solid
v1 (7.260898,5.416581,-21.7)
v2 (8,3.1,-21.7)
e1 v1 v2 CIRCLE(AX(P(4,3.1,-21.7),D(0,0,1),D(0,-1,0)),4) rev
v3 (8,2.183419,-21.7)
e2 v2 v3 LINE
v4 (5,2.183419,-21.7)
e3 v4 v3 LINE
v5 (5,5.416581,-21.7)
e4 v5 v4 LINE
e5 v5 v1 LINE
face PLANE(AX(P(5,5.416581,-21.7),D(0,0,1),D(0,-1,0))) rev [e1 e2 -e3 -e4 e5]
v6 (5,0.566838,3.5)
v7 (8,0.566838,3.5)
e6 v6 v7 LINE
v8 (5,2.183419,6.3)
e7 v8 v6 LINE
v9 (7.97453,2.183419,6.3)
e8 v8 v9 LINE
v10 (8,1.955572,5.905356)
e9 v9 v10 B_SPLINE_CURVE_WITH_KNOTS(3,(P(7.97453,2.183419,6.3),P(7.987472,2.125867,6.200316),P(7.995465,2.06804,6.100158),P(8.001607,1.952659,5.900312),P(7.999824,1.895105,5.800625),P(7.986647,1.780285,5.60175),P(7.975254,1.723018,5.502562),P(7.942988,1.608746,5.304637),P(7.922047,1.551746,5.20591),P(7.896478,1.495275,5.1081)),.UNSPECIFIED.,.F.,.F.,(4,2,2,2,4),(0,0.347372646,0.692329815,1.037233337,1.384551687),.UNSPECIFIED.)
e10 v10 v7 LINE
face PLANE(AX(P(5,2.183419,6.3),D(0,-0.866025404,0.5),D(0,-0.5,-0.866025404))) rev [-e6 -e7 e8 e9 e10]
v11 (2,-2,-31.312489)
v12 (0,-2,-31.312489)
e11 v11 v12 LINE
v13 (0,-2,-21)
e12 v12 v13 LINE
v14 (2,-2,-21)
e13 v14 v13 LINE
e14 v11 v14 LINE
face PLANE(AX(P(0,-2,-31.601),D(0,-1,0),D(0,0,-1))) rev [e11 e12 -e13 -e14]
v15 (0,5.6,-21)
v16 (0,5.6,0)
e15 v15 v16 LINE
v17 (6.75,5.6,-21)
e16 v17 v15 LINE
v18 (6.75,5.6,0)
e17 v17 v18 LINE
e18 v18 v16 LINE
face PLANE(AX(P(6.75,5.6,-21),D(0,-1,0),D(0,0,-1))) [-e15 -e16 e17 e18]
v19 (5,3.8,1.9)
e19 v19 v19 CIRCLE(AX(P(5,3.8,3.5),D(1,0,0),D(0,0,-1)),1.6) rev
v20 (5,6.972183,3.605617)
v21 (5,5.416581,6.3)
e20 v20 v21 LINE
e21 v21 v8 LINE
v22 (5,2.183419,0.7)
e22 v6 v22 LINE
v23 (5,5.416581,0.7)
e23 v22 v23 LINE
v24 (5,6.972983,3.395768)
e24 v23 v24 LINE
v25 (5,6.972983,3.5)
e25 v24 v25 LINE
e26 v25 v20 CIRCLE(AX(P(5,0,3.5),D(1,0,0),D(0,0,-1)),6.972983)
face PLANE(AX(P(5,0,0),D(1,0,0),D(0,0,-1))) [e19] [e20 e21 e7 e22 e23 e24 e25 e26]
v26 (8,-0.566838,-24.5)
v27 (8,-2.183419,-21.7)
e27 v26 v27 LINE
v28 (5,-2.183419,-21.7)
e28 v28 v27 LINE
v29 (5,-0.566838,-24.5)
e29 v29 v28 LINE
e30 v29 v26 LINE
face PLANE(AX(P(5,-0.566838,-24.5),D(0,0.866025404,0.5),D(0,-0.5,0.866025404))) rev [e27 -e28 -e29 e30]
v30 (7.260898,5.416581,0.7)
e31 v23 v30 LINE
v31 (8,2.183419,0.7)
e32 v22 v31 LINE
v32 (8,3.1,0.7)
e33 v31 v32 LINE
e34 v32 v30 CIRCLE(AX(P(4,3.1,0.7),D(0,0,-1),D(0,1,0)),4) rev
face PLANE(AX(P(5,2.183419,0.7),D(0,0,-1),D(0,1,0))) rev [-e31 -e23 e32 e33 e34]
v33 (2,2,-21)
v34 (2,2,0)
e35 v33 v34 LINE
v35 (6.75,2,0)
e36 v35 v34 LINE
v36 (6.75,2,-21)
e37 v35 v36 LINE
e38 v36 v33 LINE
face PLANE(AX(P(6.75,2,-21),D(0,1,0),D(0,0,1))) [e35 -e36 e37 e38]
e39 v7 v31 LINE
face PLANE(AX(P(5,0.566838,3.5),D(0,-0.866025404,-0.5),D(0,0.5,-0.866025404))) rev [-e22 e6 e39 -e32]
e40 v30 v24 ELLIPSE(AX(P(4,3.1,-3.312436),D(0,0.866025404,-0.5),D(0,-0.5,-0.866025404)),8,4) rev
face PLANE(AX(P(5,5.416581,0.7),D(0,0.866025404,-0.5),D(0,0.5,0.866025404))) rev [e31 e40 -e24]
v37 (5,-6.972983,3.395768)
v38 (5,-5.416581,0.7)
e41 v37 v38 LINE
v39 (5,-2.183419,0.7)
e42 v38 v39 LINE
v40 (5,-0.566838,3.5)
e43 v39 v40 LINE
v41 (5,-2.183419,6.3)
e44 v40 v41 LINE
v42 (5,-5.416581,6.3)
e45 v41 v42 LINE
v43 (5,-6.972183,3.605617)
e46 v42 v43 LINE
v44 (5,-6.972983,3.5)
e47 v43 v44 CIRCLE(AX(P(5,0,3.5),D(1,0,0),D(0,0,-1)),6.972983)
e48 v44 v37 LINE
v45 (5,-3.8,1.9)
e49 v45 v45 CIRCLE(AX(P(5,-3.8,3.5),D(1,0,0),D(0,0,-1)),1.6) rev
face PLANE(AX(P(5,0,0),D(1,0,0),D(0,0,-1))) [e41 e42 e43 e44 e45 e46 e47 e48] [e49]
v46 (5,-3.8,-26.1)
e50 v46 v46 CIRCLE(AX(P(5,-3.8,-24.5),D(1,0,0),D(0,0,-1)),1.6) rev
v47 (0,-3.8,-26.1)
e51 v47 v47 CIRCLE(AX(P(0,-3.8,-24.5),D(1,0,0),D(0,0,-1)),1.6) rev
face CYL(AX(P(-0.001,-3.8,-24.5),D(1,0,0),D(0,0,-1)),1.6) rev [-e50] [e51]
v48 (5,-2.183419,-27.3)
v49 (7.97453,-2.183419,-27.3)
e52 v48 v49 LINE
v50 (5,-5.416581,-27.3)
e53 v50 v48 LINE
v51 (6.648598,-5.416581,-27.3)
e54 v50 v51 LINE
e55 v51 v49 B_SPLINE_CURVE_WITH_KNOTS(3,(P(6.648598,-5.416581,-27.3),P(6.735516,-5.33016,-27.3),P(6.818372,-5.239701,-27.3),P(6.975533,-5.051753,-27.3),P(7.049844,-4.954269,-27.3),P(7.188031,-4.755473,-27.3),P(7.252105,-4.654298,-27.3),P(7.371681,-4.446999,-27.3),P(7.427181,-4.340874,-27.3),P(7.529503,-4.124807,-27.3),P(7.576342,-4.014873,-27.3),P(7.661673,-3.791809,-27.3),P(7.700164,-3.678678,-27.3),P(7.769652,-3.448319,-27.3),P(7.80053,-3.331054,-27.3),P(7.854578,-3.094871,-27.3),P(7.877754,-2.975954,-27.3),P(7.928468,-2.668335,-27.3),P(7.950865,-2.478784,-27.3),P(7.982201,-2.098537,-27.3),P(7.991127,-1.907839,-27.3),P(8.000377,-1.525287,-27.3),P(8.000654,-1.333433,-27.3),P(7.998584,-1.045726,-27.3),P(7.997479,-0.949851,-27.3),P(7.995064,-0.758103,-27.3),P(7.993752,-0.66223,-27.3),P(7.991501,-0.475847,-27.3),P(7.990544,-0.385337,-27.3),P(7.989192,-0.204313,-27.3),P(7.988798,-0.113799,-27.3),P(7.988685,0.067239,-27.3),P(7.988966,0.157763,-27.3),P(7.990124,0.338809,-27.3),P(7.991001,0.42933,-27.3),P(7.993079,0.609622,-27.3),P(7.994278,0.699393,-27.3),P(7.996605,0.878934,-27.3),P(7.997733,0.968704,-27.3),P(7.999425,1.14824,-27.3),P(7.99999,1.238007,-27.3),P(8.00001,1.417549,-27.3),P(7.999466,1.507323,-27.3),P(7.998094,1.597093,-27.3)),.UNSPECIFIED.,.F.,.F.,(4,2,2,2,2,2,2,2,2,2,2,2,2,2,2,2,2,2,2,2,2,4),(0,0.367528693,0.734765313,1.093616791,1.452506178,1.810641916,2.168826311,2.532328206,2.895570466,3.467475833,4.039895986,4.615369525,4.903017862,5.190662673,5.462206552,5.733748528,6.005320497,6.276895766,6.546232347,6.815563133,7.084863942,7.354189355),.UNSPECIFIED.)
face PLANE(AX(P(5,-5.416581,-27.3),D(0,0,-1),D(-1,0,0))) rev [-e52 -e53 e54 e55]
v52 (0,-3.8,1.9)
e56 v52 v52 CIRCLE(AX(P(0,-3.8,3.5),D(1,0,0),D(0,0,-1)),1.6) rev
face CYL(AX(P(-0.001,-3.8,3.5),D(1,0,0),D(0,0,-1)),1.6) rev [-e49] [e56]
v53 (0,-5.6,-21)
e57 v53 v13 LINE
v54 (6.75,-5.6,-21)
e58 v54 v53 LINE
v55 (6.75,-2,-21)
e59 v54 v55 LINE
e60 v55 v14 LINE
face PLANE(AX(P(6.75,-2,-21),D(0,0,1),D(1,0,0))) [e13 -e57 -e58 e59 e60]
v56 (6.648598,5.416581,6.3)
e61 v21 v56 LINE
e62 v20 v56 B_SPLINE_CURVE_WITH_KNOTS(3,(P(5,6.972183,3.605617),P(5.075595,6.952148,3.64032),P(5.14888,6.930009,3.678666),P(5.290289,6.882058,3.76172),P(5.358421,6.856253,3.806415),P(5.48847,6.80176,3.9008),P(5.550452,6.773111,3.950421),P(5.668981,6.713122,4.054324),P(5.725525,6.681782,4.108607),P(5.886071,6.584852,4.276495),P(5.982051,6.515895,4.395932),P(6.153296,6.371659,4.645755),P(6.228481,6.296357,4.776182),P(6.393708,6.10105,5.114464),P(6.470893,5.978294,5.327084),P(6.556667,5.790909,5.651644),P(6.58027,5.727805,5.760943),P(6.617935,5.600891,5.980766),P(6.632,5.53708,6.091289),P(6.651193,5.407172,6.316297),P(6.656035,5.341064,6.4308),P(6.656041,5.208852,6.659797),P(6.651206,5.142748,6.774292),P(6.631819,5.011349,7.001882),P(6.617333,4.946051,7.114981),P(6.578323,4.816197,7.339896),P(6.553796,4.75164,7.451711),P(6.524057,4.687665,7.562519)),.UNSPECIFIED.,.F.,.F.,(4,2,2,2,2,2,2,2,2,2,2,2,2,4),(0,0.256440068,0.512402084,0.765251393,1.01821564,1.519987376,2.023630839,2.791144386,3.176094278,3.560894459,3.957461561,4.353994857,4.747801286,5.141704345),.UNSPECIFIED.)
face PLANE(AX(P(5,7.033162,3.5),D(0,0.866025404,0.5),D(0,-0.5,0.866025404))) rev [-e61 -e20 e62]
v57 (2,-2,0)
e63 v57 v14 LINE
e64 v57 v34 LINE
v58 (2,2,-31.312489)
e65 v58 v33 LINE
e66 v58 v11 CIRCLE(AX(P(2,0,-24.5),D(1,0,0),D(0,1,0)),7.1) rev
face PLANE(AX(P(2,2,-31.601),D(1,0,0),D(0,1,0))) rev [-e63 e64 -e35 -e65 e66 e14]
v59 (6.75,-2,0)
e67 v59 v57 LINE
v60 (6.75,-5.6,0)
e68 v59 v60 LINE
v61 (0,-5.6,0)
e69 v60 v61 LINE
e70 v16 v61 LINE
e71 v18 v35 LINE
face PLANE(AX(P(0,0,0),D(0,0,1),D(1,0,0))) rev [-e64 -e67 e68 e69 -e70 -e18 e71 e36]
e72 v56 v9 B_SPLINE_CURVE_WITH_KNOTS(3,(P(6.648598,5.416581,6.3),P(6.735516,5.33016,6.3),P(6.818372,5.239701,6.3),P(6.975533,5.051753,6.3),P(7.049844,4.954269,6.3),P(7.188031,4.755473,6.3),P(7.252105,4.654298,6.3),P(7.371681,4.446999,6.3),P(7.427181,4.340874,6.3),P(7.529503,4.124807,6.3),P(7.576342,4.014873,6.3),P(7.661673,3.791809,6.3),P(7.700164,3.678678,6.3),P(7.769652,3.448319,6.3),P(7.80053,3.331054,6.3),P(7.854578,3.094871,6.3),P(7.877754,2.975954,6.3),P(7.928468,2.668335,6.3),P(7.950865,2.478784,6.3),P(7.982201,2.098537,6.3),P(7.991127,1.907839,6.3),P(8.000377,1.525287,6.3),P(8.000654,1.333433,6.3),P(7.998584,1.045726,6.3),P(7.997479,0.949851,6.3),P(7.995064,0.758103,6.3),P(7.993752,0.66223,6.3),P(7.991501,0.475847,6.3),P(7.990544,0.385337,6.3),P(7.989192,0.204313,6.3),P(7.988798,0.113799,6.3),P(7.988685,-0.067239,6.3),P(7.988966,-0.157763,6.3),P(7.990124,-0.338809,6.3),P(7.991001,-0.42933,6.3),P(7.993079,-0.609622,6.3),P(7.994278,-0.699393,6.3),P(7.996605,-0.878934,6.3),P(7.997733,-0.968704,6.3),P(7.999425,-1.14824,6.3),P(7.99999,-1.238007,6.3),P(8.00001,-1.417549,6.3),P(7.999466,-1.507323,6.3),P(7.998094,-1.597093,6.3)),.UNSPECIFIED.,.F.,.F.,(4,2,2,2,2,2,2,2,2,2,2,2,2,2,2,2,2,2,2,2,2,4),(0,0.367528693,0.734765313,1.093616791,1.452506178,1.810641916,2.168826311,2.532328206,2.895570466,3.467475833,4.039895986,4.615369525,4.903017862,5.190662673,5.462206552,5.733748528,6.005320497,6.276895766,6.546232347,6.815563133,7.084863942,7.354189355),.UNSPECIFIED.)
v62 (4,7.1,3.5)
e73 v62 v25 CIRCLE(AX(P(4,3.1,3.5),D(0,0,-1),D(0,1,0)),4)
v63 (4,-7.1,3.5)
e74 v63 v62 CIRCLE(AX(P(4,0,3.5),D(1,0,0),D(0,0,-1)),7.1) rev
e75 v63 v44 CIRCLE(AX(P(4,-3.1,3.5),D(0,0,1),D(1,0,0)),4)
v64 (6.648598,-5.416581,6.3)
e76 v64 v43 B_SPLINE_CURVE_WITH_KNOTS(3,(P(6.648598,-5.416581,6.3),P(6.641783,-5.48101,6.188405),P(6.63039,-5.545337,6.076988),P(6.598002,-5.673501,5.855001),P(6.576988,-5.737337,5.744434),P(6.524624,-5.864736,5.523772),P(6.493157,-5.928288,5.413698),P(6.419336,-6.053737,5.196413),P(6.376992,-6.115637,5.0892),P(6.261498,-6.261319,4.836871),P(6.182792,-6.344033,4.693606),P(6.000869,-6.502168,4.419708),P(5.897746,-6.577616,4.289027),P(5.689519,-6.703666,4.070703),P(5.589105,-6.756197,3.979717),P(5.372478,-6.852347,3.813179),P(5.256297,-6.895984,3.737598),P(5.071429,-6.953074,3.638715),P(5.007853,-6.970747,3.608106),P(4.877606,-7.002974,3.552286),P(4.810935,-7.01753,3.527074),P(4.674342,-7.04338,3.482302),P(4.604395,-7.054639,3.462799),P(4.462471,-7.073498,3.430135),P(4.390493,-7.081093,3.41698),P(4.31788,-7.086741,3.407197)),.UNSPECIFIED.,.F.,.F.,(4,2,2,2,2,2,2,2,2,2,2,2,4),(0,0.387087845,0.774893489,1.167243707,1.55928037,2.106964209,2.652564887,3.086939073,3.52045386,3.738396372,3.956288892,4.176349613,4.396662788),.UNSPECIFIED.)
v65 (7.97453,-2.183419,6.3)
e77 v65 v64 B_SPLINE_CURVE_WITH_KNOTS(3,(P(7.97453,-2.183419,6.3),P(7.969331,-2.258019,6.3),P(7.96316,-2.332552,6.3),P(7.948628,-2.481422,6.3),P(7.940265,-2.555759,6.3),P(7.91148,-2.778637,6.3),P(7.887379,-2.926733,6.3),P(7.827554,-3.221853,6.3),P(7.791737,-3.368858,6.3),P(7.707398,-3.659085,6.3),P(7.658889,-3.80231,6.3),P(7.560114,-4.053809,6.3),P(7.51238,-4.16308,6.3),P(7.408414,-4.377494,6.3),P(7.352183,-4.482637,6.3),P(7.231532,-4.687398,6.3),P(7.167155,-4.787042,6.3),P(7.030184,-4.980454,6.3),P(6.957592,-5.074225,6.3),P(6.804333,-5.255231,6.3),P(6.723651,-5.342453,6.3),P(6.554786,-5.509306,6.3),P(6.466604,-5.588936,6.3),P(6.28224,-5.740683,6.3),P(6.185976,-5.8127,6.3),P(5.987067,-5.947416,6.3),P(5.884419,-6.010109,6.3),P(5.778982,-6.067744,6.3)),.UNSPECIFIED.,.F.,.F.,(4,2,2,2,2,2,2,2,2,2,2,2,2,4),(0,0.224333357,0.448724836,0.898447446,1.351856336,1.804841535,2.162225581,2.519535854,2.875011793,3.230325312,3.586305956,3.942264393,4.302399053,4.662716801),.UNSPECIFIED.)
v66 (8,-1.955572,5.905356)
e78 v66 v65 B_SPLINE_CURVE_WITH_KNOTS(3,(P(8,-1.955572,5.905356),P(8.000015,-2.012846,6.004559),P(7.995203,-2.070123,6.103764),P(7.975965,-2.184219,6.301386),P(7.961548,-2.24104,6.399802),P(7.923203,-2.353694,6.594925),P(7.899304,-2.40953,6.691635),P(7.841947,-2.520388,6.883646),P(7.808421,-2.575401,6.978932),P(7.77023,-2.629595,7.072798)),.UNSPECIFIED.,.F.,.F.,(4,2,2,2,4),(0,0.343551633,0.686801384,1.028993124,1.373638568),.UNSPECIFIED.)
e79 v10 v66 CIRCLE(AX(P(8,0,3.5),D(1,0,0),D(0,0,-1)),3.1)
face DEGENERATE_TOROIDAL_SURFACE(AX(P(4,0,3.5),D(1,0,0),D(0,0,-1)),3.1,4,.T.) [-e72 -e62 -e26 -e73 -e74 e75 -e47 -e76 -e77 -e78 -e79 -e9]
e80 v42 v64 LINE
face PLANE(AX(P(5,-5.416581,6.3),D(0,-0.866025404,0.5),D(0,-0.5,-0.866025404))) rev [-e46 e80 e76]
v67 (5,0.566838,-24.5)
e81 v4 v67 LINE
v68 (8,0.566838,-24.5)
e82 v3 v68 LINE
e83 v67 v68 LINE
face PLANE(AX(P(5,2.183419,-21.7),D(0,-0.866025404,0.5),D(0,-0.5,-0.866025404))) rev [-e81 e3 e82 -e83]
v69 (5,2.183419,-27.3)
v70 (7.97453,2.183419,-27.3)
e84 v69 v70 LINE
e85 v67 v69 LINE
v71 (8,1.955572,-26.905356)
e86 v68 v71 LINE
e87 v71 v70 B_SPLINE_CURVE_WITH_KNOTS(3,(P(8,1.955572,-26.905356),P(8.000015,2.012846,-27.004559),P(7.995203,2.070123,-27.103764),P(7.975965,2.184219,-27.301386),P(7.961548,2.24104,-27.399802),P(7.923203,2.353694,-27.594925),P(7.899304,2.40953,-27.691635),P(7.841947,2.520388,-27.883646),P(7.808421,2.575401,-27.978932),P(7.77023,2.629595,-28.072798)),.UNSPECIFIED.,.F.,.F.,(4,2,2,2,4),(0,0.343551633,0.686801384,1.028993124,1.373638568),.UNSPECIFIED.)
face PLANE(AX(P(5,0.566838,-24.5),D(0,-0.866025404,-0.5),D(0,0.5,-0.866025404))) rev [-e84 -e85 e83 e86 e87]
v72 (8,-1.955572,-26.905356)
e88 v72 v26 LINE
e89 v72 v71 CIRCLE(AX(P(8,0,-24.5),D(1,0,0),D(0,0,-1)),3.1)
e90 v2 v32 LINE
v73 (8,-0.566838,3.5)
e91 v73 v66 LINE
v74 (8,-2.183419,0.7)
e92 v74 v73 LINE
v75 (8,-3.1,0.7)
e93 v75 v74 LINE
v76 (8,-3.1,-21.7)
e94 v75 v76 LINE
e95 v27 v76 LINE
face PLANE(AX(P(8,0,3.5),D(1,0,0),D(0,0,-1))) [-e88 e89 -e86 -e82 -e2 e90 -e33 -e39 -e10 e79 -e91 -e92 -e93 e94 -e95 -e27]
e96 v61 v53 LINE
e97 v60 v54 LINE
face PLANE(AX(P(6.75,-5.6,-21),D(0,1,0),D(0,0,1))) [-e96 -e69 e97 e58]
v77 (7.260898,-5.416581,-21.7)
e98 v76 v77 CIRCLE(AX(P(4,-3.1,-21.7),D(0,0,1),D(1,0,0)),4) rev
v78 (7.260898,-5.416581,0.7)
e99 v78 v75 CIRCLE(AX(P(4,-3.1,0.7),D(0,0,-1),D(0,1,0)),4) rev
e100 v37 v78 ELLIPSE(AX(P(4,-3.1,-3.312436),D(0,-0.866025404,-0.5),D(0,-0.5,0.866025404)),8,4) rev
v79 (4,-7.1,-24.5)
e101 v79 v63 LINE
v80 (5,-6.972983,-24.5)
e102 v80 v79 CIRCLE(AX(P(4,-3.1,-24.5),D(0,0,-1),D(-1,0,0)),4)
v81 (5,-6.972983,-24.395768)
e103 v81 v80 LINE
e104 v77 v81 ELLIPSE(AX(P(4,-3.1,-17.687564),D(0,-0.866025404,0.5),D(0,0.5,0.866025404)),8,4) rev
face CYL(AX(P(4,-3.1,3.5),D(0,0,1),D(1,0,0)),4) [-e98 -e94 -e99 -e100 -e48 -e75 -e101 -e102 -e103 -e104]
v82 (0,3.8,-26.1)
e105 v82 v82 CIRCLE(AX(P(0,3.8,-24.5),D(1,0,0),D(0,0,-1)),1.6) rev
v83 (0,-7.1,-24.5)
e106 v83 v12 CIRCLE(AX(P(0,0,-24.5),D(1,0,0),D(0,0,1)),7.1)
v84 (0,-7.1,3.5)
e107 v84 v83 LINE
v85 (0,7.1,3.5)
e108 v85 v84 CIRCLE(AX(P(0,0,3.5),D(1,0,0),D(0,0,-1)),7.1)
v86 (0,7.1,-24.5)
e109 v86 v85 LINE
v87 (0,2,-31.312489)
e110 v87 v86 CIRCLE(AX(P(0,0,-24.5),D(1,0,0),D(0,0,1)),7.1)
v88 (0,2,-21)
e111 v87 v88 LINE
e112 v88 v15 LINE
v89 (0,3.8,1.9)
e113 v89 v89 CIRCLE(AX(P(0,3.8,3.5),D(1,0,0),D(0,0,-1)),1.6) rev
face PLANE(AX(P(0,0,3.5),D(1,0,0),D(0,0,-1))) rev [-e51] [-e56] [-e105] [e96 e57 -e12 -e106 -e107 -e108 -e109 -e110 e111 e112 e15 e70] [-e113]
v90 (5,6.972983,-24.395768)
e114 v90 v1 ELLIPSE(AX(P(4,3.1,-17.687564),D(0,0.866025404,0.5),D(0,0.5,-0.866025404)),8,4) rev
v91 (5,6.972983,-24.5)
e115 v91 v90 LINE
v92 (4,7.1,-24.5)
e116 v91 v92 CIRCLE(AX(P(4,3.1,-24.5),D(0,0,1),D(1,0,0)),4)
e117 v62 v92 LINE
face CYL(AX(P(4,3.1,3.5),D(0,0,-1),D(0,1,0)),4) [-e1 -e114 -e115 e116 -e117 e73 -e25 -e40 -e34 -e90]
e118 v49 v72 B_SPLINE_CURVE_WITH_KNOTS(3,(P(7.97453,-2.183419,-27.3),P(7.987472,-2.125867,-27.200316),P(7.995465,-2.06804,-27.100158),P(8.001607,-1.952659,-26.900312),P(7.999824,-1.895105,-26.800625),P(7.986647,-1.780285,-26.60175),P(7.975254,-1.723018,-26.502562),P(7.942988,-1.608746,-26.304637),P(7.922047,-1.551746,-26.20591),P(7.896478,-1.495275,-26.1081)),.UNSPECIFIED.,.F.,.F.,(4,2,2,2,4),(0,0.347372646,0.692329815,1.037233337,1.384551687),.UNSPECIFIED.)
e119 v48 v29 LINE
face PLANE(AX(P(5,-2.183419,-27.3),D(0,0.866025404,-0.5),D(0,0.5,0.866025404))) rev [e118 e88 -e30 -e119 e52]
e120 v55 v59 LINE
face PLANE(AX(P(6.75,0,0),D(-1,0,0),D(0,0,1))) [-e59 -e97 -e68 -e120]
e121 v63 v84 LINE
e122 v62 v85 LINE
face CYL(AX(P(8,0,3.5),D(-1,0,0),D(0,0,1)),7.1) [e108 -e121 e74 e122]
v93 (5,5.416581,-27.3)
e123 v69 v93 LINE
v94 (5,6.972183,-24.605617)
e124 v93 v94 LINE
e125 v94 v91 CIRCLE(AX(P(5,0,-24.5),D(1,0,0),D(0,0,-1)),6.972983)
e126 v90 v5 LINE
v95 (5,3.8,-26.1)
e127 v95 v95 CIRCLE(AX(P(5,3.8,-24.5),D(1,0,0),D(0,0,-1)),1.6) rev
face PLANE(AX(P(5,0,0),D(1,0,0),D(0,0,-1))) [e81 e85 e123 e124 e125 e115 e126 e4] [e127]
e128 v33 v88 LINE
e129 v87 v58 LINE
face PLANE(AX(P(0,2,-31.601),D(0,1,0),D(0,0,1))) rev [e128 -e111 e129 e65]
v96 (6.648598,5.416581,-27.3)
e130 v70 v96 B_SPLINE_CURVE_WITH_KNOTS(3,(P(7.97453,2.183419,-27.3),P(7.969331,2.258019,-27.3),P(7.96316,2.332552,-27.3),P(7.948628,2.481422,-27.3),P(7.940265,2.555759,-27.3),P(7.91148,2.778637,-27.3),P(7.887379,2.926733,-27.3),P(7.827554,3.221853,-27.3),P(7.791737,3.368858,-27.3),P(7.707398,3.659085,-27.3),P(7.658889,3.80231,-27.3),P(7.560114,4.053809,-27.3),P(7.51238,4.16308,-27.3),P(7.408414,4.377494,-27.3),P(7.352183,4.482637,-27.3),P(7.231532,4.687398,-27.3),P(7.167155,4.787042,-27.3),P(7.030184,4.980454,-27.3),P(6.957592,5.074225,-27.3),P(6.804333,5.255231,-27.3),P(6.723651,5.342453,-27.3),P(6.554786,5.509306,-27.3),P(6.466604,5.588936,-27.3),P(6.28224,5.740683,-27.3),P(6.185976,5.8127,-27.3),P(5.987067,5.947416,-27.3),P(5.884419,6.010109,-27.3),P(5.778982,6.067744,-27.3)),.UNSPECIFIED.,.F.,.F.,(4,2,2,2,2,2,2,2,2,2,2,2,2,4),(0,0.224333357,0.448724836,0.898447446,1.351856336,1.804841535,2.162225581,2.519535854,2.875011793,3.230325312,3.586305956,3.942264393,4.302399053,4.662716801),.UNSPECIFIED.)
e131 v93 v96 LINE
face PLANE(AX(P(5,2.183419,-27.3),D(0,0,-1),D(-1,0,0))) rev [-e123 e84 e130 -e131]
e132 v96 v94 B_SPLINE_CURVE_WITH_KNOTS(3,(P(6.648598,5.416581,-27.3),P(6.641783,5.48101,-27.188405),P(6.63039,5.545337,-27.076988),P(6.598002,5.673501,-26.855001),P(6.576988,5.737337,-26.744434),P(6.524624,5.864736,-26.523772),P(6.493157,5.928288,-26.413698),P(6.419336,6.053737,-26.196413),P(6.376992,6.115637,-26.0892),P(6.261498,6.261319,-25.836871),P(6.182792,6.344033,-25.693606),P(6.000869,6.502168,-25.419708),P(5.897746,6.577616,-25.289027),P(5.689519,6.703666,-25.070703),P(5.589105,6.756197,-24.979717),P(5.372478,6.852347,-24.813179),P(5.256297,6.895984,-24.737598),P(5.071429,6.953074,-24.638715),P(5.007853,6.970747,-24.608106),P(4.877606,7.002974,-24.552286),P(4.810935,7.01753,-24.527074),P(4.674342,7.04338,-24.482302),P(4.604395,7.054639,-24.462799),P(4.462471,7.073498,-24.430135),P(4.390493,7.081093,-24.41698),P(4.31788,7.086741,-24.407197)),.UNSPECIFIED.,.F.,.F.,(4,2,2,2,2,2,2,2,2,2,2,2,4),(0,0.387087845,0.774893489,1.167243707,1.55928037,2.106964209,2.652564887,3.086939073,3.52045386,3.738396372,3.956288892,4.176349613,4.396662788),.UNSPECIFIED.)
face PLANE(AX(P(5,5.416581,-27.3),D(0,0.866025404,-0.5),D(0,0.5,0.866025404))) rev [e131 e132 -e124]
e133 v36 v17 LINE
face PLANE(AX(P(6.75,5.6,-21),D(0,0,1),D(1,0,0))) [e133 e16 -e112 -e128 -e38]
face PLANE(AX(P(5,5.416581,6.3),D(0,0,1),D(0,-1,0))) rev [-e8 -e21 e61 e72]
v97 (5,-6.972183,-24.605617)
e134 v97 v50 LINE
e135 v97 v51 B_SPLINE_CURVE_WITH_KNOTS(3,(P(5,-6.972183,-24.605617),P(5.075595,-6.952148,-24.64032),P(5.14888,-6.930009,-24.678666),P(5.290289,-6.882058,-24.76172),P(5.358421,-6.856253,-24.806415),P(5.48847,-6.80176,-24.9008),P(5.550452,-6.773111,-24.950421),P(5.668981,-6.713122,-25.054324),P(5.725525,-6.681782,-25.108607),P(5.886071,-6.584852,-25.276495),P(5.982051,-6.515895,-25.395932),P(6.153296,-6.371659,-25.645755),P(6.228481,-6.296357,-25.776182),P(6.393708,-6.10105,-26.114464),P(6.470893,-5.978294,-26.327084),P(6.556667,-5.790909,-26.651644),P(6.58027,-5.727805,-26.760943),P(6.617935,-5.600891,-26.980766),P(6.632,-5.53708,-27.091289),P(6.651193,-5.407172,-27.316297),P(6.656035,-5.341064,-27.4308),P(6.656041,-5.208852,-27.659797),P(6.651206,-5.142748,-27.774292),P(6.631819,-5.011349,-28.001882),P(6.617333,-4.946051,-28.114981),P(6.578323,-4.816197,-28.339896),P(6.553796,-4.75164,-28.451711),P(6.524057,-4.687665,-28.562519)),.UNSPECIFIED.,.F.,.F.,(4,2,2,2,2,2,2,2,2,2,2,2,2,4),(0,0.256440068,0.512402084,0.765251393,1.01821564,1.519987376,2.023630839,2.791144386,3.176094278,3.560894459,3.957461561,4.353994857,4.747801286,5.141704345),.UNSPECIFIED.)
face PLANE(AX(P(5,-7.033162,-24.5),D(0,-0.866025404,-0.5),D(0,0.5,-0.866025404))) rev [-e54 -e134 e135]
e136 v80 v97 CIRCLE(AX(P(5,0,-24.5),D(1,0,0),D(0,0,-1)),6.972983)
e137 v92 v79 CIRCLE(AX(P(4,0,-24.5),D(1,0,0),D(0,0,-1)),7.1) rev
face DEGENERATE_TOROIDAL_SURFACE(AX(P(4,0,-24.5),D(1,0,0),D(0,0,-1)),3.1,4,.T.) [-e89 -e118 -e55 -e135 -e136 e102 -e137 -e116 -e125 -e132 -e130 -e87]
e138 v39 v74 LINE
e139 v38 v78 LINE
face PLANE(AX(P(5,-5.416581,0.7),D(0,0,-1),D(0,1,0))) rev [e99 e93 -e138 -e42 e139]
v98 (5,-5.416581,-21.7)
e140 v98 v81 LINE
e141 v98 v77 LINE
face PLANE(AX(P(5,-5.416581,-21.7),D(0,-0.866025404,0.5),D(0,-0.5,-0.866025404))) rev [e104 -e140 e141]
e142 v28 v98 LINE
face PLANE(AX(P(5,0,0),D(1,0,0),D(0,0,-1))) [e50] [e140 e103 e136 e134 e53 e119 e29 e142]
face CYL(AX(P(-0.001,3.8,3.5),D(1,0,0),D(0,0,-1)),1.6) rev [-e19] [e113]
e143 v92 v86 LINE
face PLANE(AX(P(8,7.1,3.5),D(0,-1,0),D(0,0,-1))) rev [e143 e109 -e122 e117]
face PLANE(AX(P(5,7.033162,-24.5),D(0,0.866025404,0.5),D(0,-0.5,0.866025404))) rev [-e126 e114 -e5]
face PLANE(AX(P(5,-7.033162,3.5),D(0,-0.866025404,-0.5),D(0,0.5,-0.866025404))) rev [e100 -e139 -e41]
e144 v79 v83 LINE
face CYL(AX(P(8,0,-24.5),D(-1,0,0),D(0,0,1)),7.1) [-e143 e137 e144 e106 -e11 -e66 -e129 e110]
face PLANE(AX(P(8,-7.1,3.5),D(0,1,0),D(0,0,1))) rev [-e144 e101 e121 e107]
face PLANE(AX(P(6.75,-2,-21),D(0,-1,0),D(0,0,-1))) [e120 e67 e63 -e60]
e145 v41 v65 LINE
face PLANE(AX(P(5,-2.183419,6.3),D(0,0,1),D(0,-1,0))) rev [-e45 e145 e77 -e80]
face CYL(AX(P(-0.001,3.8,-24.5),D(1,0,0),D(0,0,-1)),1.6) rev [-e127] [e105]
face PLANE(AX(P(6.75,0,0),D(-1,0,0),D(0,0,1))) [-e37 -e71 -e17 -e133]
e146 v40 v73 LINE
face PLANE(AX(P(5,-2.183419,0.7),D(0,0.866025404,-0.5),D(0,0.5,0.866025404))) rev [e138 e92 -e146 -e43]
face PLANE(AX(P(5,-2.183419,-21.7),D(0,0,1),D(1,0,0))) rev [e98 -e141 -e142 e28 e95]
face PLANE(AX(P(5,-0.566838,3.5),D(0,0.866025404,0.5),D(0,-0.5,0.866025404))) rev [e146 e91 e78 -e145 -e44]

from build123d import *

# Parameters (mm, degrees)
BOSS_EXTRUDE1_DEPTH = 8
CUT_EXTRUDE5_REACH  = 35.361
SKETCH4_W           = 2
SKETCH4_H           = 4
SKETCH5_W           = 21
SKETCH5_H           = 3.6
CUT_EXTRUDE2_DEPTH  = 6.75
SKETCH6_R           = 1.6
CUT_EXTRUDE3_DEPTH  = 8
CUT_EXTRUDE4_DEPTH  = 3
FILLET1_R           = 4


with BuildPart() as part:
    # Sketch2 → Boss-Extrude1 (new body)
    with BuildSketch(Plane(origin=(0, 0, 0), x_dir=(0, 0, -1), z_dir=(1, 0, 0))):
        with BuildLine():
            Line((-3.5, 7.1), (24.5, 7.1))
            ThreePointArc((24.5, 7.1), (31.6, 0), (24.5, -7.1))
            Line((24.5, -7.1), (-3.5, -7.1))
            ThreePointArc((-3.5, -7.1), (-10.6, 0), (-3.5, 7.1))
        make_face()
    extrude(amount=BOSS_EXTRUDE1_DEPTH)

    # Sketch4 → Cut-Extrude5 (cut, up to next)
    with BuildSketch(Plane.XY, mode=Mode.PRIVATE) as cut_extrude5_sk1:
        with Locations((1, 0)):
            Rectangle(SKETCH4_W, SKETCH4_H)
    cut_extrude5_tool1 = extrude(cut_extrude5_sk1.sketch, amount=-CUT_EXTRUDE5_REACH, mode=Mode.PRIVATE) & part.part
    add(cut_extrude5_tool1.solids().sort_by_distance((1, 0, 0))[0], mode=Mode.SUBTRACT)

    # Sketch5 → Cut-Extrude2 (cut)
    with BuildSketch(Plane(origin=(0, 0, 0), x_dir=(0, 0, -1), z_dir=(1, 0, 0))):
        with Locations((10.5, 3.8)):
            Rectangle(SKETCH5_W, SKETCH5_H)
        with Locations((10.5, -3.8)):
            Rectangle(SKETCH5_W, SKETCH5_H)
    extrude(amount=CUT_EXTRUDE2_DEPTH, mode=Mode.SUBTRACT)

    # Sketch6 → Cut-Extrude3 (cut)
    with BuildSketch(Plane(origin=(8, 0, 0), x_dir=(0, 0, -1), z_dir=(1, 0, 0))):
        with Locations((-3.5, 3.8)):
            Circle(SKETCH6_R)
        with Locations((-3.5, -3.8)):
            Circle(SKETCH6_R)
        with Locations((24.5, 3.8)):
            Circle(SKETCH6_R)
        with Locations((24.5, -3.8)):
            Circle(SKETCH6_R)
    extrude(amount=-CUT_EXTRUDE3_DEPTH, mode=Mode.SUBTRACT)

    # Sketch7 → Cut-Extrude4 (cut)
    with BuildSketch(Plane(origin=(8, 0, 0), x_dir=(0, 0, -1), z_dir=(1, 0, 0))):
        Polygon((-0.7, 2.183419246), (-0.7, 5.416580754), (-3.5, 7.033161507), (-6.3, 5.416580754), (-6.3, 2.183419246), (-3.5, 0.566838493), align=None)
        Polygon((21.7, 5.416580754), (21.7, 2.183419246), (24.5, 0.566838493), (27.3, 2.183419246), (27.3, 5.416580754), (24.5, 7.033161507), align=None)
        Polygon((21.7, -2.183419246), (21.7, -5.416580754), (24.5, -7.033161507), (27.3, -5.416580754), (27.3, -2.183419246), (24.5, -0.566838493), align=None)
        Polygon((-3.5, -7.033161507), (-0.7, -5.416580754), (-0.7, -2.183419246), (-3.5, -0.566838493), (-6.3, -2.183419246), (-6.3, -5.416580754), align=None)
    extrude(amount=-CUT_EXTRUDE4_DEPTH, mode=Mode.SUBTRACT)

    # Fillet1
    # the kernel refuses this fillet: 4 mm, written as the material it takes off along each edge
    with BuildSketch(Plane(origin=(8, 7.1, 3.5), x_dir=(0, -1, 0), z_dir=(0, 0, -1))) as fillet1_piece_1:
        with BuildLine():
            CenterArc((FILLET1_R, FILLET1_R), FILLET1_R, 180, 90)
            Line((0, FILLET1_R), (0, 0))
            Line((0, 0), (FILLET1_R, 0))
        make_face()
    extrude(amount=28, mode=Mode.SUBTRACT)
    with BuildSketch(Plane(origin=(8, 0, -24.5), x_dir=(0, 1, 0), z_dir=(0, 0, 1))) as fillet1_piece_2:
        with BuildLine():
            CenterArc((7.1 - FILLET1_R, FILLET1_R), FILLET1_R, 270, 90)
            Line((7.1 - FILLET1_R, 0), (7.1, 0))
            Line((7.1, 0), (7.1, FILLET1_R))
        make_face()
    revolve(axis=Axis((8, 0, -24.5), (-1, 0, 0)), revolution_arc=180, mode=Mode.SUBTRACT)
    with BuildSketch(Plane(origin=(8, -7.1, -24.5), x_dir=(-1, 0, 0), z_dir=(0, 0, 1))) as fillet1_piece_3:
        with BuildLine():
            CenterArc((FILLET1_R, -FILLET1_R), FILLET1_R, 90, 90)
            Line((0, -FILLET1_R), (0, 0))
            Line((0, 0), (FILLET1_R, 0))
        make_face()
    extrude(amount=28, mode=Mode.SUBTRACT)
    with BuildSketch(Plane(origin=(8, 0, 3.5), x_dir=(0, -1, 0), z_dir=(0, 0, -1))) as fillet1_piece_4:
        with BuildLine():
            CenterArc((7.1 - FILLET1_R, FILLET1_R), FILLET1_R, 270, 90)
            Line((7.1, FILLET1_R), (7.1, 0))
            Line((7.1, 0), (7.1 - FILLET1_R, 0))
        make_face()
    revolve(axis=Axis((8, 0, 3.5), (-1, 0, 0)), revolution_arc=180, mode=Mode.SUBTRACT)


solid = part.part
